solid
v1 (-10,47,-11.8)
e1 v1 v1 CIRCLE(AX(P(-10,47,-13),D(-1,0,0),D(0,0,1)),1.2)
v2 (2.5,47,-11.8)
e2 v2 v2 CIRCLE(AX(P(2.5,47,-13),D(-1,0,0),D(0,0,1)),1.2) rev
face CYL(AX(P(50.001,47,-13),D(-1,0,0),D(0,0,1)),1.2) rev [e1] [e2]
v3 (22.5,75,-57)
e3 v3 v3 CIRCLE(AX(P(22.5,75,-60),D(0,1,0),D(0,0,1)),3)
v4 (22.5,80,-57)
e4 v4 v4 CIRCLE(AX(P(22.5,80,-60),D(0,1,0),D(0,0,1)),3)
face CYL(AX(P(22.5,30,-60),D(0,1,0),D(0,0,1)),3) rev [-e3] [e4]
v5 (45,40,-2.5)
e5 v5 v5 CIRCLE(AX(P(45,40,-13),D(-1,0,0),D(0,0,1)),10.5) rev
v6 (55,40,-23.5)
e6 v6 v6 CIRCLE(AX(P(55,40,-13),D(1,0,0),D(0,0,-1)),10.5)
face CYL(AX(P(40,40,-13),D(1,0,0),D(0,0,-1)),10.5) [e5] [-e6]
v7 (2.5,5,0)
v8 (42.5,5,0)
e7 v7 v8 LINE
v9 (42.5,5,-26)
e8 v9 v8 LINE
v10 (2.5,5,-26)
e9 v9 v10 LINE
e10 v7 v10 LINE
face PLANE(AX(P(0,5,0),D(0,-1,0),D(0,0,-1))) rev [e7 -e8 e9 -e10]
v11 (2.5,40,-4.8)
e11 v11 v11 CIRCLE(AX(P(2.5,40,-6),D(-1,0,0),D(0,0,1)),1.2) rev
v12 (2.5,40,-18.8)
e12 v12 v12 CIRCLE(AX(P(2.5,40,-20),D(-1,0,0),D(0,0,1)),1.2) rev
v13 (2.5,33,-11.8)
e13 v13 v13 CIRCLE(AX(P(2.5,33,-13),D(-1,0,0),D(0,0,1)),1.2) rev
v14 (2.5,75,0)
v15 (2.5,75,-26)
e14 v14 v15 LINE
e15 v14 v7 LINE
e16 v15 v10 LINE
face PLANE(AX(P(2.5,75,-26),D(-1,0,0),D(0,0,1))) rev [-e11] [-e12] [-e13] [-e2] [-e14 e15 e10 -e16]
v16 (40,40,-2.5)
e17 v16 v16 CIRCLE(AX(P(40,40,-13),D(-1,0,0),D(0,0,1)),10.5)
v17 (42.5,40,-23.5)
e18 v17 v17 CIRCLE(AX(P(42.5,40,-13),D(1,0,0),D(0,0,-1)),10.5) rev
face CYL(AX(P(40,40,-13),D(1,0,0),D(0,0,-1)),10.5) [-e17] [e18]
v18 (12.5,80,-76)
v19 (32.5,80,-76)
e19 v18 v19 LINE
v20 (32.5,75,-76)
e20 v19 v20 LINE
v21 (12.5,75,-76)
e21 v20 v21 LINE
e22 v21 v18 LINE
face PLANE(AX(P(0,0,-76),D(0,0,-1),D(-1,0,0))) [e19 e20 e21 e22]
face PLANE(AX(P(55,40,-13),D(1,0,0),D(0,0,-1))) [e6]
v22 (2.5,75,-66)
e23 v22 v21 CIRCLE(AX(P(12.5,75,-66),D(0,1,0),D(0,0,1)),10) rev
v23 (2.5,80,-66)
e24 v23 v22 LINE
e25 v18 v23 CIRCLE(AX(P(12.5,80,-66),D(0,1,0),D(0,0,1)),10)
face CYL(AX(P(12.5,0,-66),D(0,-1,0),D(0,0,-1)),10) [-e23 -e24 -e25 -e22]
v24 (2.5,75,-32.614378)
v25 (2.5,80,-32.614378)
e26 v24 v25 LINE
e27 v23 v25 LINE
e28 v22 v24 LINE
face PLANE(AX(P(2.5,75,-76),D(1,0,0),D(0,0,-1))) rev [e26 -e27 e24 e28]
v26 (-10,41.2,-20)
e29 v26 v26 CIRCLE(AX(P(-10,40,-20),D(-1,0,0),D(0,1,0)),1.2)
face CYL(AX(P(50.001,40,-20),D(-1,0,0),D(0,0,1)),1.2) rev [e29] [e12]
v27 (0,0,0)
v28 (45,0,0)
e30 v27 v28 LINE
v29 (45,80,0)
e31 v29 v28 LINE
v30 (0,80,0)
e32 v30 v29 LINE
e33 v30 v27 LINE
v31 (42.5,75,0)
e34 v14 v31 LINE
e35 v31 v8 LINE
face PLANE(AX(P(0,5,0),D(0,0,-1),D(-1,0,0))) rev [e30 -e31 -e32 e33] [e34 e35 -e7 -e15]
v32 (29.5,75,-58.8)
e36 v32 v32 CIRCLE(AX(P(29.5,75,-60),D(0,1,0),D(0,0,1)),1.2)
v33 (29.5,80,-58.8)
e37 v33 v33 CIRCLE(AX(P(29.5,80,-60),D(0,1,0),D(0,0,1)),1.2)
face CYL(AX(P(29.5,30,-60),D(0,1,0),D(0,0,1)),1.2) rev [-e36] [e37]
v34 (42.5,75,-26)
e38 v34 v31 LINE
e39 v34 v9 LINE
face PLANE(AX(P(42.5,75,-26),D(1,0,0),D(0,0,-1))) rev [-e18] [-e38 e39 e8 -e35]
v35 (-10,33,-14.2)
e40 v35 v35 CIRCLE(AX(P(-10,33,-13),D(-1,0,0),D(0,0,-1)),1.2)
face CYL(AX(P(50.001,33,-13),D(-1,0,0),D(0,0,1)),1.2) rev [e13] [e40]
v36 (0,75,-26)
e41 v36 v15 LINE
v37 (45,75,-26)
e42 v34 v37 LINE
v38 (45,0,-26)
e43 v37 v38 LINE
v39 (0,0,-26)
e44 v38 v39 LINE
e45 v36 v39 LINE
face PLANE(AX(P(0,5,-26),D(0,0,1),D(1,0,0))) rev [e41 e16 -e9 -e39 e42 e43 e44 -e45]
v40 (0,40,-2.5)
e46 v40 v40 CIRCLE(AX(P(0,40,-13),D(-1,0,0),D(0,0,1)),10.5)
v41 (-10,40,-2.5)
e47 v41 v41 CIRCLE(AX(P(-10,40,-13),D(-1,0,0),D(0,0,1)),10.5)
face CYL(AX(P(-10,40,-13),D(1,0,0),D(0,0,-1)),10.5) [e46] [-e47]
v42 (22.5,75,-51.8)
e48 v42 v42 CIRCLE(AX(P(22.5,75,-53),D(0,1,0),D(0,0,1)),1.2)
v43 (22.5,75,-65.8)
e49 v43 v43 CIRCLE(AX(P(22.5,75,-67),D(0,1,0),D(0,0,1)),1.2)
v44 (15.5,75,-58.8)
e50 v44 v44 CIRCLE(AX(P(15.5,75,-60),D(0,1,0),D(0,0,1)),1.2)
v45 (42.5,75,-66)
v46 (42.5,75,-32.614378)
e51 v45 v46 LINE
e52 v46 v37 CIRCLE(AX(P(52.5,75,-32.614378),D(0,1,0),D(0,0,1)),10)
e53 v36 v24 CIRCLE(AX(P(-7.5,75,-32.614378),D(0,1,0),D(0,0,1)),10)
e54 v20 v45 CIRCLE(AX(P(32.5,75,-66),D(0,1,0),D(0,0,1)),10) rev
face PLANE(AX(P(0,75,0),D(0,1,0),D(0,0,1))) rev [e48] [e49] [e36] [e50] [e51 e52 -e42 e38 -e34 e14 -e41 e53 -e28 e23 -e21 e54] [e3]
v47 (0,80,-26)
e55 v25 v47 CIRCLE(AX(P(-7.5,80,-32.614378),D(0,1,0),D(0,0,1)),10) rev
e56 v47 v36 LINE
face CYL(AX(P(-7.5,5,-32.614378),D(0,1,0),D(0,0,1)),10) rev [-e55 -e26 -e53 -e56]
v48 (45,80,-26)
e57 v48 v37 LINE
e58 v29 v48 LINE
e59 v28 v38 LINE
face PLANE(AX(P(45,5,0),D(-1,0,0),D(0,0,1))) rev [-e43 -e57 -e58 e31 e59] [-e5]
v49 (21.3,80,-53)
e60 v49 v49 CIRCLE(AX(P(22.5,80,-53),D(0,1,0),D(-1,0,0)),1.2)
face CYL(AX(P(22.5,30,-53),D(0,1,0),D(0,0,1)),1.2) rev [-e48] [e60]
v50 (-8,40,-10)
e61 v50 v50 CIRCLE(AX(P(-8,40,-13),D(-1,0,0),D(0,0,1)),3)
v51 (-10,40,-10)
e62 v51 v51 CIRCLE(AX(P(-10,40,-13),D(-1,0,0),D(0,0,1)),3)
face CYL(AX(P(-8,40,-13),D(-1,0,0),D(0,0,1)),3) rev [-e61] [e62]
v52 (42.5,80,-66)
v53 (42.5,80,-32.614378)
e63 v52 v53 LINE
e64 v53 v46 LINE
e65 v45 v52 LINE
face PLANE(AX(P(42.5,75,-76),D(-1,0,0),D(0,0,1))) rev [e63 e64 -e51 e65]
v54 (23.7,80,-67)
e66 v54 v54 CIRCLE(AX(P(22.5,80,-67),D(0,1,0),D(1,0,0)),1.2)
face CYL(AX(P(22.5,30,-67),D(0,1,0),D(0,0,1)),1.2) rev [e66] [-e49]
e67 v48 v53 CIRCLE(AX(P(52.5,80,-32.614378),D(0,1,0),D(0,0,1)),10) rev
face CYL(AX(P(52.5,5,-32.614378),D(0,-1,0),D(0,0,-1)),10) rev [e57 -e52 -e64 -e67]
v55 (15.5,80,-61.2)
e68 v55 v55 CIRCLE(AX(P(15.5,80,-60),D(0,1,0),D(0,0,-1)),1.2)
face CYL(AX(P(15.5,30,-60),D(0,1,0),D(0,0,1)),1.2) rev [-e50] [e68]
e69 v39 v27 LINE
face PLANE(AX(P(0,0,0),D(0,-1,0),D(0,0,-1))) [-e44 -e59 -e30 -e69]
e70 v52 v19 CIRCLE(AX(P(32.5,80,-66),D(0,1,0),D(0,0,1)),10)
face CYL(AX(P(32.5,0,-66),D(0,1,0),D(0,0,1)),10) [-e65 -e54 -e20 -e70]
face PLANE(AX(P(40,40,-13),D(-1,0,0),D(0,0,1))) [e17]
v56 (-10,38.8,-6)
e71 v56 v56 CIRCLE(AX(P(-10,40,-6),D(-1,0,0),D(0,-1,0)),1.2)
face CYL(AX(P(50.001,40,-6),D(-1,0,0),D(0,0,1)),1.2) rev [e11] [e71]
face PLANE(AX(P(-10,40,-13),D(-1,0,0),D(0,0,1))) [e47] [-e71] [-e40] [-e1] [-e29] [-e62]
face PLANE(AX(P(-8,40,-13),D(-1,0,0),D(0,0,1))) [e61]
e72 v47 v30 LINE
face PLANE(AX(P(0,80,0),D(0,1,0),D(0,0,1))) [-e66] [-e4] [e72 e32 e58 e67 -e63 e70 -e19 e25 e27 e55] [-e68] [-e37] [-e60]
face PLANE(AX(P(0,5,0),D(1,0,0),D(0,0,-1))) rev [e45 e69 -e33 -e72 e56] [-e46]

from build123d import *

# Parameters (mm, degrees)
SKETCH1_W           = 45
SKETCH1_H           = 26
BOSS_EXTRUDE1_DEPTH = 5
SKETCH2_W           = 2.5
SKETCH2_H           = 26
BOSS_EXTRUDE2_DEPTH = 70
LPATTERN2_COUNT     = 2
LPATTERN2_PITCH     = 42.5
SKETCH3_W           = 45
SKETCH3_H           = 26
BOSS_EXTRUDE3_DEPTH = 5
SKETCH7_R           = 10.5
BOSS_EXTRUDE5_DEPTH = 10
LPATTERN3_COUNT     = 2
LPATTERN3_PITCH     = 50
CUT_EXTRUDE1_REACH  = 105.325
SKETCH8_R           = 1.2
CIRPATTERN1_COUNT   = 4
SKETCH9_R           = 3
CUT_EXTRUDE2_DEPTH  = 2
BOSS_EXTRUDE6_START = 5
SKETCH10_R          = 10.5
BOSS_EXTRUDE6_DEPTH = 5
SKETCH11_W          = 40
SKETCH11_H          = 5
BOSS_EXTRUDE7_DEPTH = 50
FILLET1_R           = 10
SKETCH12_R          = 3
SKETCH12_R_2        = 1.2
CUT_EXTRUDE3_DEPTH  = 50
CIRPATTERN2_COUNT   = 4


with BuildPart() as part:
    # Sketch1 → Boss-Extrude1 (new body)
    with BuildSketch(Plane(origin=(0, 0, 0), x_dir=(1, 0, 0), z_dir=(0, 1, 0))):
        with Locations((22.5, 13)):
            Rectangle(SKETCH1_W, SKETCH1_H)
    extrude(amount=BOSS_EXTRUDE1_DEPTH)

    # Sketch2 → Boss-Extrude2 (add)
    with BuildSketch(Plane(origin=(0, 5, 0), x_dir=(1, 0, 0), z_dir=(0, 1, 0))):
        with Locations((1.25, 13)):
            Rectangle(SKETCH2_W, SKETCH2_H)
    boss_extrude2 = extrude(amount=BOSS_EXTRUDE2_DEPTH)

    # LPattern2: Boss-Extrude2 ×2
    with Locations(*[(i * LPATTERN2_PITCH, 0, 0) for i in range(1, LPATTERN2_COUNT)]):
        add(boss_extrude2)

    # Sketch3 → Boss-Extrude3 (add)
    with BuildSketch(Plane(origin=(0, 75, 0), x_dir=(1, 0, 0), z_dir=(0, 1, 0))):
        with Locations((22.5, 13)):
            Rectangle(SKETCH3_W, SKETCH3_H)
    extrude(amount=BOSS_EXTRUDE3_DEPTH)

    # Sketch7 → Boss-Extrude5 (add)
    with BuildSketch(Plane.ZY):
        with Locations((-13, 40)):
            Circle(SKETCH7_R)
    boss_extrude5 = extrude(amount=BOSS_EXTRUDE5_DEPTH)

    # LPattern3: Boss-Extrude5 ×2
    with Locations(*[(i * LPATTERN3_PITCH, 0, 0) for i in range(1, LPATTERN3_COUNT)]):
        add(boss_extrude5)

    # Sketch8 → Cut-Extrude1 (cut, up to next)
    with BuildSketch(Plane.ZY.offset(10), mode=Mode.PRIVATE) as cut_extrude1_sk1:
        with Locations((-13, 47)):
            Circle(SKETCH8_R)
    cut_extrude1_tool1 = extrude(cut_extrude1_sk1.sketch, amount=-CUT_EXTRUDE1_REACH, mode=Mode.PRIVATE) & part.part
    cut_extrude1 = cut_extrude1_tool1.solids().sort_by_distance((-10, 47, -13))[0]
    add(cut_extrude1, mode=Mode.SUBTRACT)

    # CirPattern1: Cut-Extrude1 ×4 about axis
    cirpattern1_axis = Axis((0, 40, -13), (1, 0, 0))
    for i in range(1, CIRPATTERN1_COUNT):
        add(cut_extrude1.rotate(cirpattern1_axis, i * 360 / CIRPATTERN1_COUNT), mode=Mode.SUBTRACT)

    # Sketch9 → Cut-Extrude2 (cut)
    with BuildSketch(Plane.ZY.offset(10)):
        with Locations((-13, 40)):
            Circle(SKETCH9_R)
    extrude(amount=-CUT_EXTRUDE2_DEPTH, mode=Mode.SUBTRACT)

    # Sketch10 → Boss-Extrude6 (add)
    with BuildSketch(Plane(origin=(50, 0, 0), x_dir=(0, 0, -1), z_dir=(1, 0, 0)).offset(BOSS_EXTRUDE6_START)):
        with Locations(Location((13, 40, 0), (0, 0, 180))):
            Circle(SKETCH10_R)
    extrude(amount=-BOSS_EXTRUDE6_DEPTH)

    # Sketch11 → Boss-Extrude7 (add)
    with BuildSketch(Plane(origin=(0, 0, -26), x_dir=(-1, 0, 0), z_dir=(0, 0, -1))):
        with Locations((-22.5, 77.5)):
            Rectangle(SKETCH11_W, SKETCH11_H)
    extrude(amount=BOSS_EXTRUDE7_DEPTH)

    # Fillet1
    # the kernel refuses this fillet: 10 mm, written as the material it adds along each edge
    with BuildSketch(Plane(origin=(2.5, 80, -26), x_dir=(-1, 0, 0), z_dir=(0, -1, 0)), Plane(origin=(42.5, 75, -26), x_dir=(1, 0, 0), z_dir=(0, 1, 0))) as fillet1_piece_1:
        with BuildLine():
            CenterArc((10, 6.614378278), FILLET1_R, 180, 41.409622109)
            Line((0, 6.614378278), (0, 0))
            Line((0, 0), (2.5, 0))
        make_face()
    extrude(amount=5)
    # the kernel refuses this fillet: 10 mm, written as the material it takes off along each edge
    with BuildSketch(Plane(origin=(2.5, 105, -76), x_dir=(0, 0, 1), z_dir=(0, -1, 0))) as fillet1_2_piece_1:
        with BuildLine():
            CenterArc((FILLET1_R, -FILLET1_R), FILLET1_R, 90, 90)
            Line((0, -FILLET1_R), (0, 0))
            Line((0, 0), (FILLET1_R, 0))
        make_face()
    extrude(amount=55, mode=Mode.SUBTRACT)
    with BuildSketch(Plane(origin=(42.5, 50, -76), x_dir=(-1, 0, 0), z_dir=(0, 1, 0))) as fillet1_2_piece_2:
        with BuildLine():
            CenterArc((FILLET1_R, FILLET1_R), FILLET1_R, 180, 90)
            Line((0, FILLET1_R), (0, 0))
            Line((0, 0), (FILLET1_R, 0))
        make_face()
    extrude(amount=55, mode=Mode.SUBTRACT)

    # Sketch12 → Cut-Extrude3 (cut)
    with BuildSketch(Plane(origin=(0, 80, 0), x_dir=(1, 0, 0), z_dir=(0, 1, 0))):
        with Locations(Location((22.5, 60, 0), (0, 0, 270))):
            Circle(SKETCH12_R)
        with Locations(Location((29.5, 60, 0), (0, 0, 270))):
            Circle(SKETCH12_R_2)
    cut_extrude3 = extrude(amount=-CUT_EXTRUDE3_DEPTH, mode=Mode.SUBTRACT)

    # CirPattern2: Cut-Extrude3 ×4 about axis
    cirpattern2_axis = Axis((22.5, 0, -60), (0, 1, 0))
    for i in range(1, CIRPATTERN2_COUNT):
        add(cut_extrude3.rotate(cirpattern2_axis, i * 360 / CIRPATTERN2_COUNT), mode=Mode.SUBTRACT)


solid = part.part
